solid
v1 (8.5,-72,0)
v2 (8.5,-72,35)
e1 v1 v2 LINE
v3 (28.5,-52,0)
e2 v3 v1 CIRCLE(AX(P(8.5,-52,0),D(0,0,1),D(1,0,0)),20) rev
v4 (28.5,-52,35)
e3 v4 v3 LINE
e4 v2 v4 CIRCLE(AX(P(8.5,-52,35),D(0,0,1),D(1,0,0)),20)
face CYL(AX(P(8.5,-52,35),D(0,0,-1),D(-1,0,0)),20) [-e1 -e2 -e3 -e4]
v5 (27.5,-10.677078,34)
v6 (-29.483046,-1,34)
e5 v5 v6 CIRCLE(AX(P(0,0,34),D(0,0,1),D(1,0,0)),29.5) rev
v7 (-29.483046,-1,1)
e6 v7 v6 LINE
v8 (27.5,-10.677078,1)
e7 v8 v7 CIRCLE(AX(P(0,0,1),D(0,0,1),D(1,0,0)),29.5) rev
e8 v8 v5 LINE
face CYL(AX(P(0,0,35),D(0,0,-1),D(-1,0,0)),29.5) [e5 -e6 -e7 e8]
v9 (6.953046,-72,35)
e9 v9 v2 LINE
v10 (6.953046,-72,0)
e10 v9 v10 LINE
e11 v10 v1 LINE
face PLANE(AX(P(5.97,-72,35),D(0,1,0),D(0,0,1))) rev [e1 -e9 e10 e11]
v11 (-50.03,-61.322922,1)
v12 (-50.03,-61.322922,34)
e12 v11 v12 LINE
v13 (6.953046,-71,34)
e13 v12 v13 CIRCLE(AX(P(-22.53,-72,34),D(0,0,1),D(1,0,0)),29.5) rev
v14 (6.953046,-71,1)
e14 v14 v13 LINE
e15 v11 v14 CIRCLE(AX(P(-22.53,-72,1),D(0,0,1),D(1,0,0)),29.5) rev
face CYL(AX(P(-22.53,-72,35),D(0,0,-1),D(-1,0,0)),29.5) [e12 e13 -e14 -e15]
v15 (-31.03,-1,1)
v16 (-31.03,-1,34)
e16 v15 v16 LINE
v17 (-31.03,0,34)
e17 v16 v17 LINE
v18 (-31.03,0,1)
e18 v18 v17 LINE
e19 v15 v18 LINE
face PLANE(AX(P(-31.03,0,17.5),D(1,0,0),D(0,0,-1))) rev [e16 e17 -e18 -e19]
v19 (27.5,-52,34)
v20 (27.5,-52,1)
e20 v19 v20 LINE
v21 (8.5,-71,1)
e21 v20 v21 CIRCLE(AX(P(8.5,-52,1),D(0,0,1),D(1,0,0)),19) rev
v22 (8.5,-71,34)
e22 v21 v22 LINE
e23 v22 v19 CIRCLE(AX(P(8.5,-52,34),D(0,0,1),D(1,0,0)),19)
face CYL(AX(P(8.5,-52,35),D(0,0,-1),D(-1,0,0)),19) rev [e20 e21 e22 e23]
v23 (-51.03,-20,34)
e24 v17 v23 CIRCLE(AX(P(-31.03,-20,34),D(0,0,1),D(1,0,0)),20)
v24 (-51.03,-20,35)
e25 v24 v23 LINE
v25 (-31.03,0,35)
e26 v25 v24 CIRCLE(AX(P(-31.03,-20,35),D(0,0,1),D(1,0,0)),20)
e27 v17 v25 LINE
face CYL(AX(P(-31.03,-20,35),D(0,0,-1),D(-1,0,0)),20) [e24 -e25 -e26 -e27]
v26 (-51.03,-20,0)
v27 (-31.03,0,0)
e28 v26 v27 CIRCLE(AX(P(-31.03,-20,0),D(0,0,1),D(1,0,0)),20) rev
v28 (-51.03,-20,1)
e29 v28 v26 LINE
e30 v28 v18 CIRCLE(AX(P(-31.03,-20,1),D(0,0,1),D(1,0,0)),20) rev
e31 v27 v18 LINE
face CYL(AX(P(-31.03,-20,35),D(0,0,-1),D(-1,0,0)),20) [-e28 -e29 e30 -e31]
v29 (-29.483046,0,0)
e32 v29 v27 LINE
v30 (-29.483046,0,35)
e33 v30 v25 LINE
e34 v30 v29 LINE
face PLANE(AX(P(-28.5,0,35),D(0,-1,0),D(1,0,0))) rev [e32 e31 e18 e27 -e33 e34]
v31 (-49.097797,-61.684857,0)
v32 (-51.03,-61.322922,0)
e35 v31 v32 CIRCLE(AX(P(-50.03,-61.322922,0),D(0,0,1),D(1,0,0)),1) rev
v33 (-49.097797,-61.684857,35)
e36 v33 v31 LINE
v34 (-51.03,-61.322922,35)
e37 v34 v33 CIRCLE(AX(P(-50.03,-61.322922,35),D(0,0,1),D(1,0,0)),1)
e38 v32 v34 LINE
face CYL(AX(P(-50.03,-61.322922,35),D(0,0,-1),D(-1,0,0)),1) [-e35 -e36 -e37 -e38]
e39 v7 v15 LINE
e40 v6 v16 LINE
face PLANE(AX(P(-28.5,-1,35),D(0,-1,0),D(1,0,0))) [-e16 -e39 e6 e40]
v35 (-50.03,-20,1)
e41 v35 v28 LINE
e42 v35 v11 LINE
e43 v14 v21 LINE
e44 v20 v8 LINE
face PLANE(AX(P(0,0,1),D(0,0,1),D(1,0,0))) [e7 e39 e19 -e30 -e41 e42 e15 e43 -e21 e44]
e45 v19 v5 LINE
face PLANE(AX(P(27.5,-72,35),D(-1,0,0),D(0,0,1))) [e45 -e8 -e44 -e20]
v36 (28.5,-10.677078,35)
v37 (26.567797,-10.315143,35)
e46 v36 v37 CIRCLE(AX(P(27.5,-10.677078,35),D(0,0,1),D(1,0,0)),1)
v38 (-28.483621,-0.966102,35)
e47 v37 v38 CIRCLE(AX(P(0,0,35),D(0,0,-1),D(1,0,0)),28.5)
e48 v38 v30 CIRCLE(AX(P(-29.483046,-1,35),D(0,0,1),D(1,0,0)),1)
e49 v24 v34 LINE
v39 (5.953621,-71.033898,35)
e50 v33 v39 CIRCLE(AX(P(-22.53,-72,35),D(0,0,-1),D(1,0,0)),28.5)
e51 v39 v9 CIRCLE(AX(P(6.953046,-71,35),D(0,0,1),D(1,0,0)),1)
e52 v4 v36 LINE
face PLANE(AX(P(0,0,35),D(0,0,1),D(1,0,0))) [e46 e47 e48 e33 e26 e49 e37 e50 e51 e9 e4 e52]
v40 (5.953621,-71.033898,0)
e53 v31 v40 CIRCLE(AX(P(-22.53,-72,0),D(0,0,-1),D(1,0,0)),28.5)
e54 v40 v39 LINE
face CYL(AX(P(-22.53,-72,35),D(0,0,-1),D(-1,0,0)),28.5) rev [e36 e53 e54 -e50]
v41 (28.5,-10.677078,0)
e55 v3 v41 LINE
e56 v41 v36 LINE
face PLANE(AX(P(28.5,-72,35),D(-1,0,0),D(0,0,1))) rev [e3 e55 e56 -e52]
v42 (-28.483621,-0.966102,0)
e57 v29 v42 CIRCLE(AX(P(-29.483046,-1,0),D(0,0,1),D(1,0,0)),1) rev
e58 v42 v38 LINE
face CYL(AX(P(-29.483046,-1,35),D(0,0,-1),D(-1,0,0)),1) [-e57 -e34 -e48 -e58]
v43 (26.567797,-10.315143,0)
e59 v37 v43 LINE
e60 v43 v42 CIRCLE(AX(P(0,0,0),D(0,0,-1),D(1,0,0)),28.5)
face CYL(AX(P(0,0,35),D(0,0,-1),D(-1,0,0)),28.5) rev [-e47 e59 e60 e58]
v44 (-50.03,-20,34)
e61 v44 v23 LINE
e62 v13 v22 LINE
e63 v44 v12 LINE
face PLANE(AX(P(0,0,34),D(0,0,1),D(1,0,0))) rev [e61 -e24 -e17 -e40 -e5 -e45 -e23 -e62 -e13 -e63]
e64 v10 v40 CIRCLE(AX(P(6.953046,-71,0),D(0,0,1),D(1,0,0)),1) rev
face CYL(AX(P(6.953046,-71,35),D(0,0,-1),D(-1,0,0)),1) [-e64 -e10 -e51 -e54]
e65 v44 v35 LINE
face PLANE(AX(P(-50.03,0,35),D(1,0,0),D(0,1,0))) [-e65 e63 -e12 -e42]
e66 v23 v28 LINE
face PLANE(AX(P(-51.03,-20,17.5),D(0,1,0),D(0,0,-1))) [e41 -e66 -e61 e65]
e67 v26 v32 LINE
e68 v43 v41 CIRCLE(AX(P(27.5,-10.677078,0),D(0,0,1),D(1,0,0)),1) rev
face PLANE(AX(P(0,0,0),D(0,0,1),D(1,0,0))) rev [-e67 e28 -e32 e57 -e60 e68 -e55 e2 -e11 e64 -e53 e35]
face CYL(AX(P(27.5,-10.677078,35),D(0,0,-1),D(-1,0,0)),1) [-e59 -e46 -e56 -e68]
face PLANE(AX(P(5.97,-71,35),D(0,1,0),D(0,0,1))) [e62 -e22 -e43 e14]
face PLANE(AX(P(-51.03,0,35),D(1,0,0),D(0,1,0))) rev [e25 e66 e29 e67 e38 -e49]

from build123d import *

# Parameters (mm, degrees)
EXTRUDE_1_DEPTH = 35
FILLET_1_R      = 1
FILLET_2_R      = 20
SHELL_START     = 1
SHELL_4_DEPTH   = 33


# Read off the part's stored shape, not the designer's step: 抽壳4
with BuildPart() as part:
    # 草图3 → 凸台-拉伸1 (new body)
    with BuildSketch(Plane.XY):
        with BuildLine():
            Line((-28.5, 0), (-51.03000000000027, -2.76e-15))
            Line((-51.03000000000027, -2.76e-15), (-51.029999999999994, -72))
            ThreePointArc((-51.029999999999994, -72), (-22.529999999999987, -43.5), (5.970000000000013, -72))
            Line((5.970000000000013, -72), (28.5, -72))
            Line((28.5, -72), (28.5, 0))
            ThreePointArc((28.5, 0), (-5.24e-15, -28.5), (-28.5, 0))
        make_face()
    extrude(amount=EXTRUDE_1_DEPTH)

    # 圆角1
    fillet_1_edges = [part.edges().sort_by_distance(p)[0] for p in [
        (5.970000000000011, -72, 17.5),
        (-51.02999999999999, -72, 17.5),
        (-28.5, -2.63e-15, 17.5),
    ]]
    fillet(fillet_1_edges, radius=FILLET_1_R)
    fillet_1_2_edges = [part.edges().sort_by_distance(p)[0] for p in [
        (28.5, 0, 17.5),
    ]]
    fillet(fillet_1_2_edges, radius=FILLET_1_R)

    # 圆角2
    fillet_2_edges = [part.edges().sort_by_distance(p)[0] for p in [
        (28.5, -72, 17.5),
        (-51.03000000000027, -2.76e-15, 17.5),
    ]]
    fillet(fillet_2_edges, radius=FILLET_2_R)

    # 抽壳4 outline → 抽壳4 (cut)
    with BuildSketch(Plane.XY.offset(SHELL_START)):
        with BuildLine():
            Line((-51.03, -20), (-50.03, -20))
            Line((-50.03, -20), (-50.03, -61.322921748))
            ThreePointArc((-50.03, -61.322921748), (-17.59091317, -42.916406321), (6.953045976, -71))
            Line((6.953045976, -71), (8.5, -71))
            ThreePointArc((8.5, -71), (21.935028843, -65.435028843), (27.5, -52))
            Line((27.5, -52), (27.5, -10.677078252))
            ThreePointArc((27.5, -10.677078252), (-4.93908683, -29.083593679), (-29.483045976, -1))
            Line((-29.483045976, -1), (-31.03, -1))
            Line((-31.03, -1), (-31.03, 0))
            ThreePointArc((-31.03, 0), (-45.172135624, -5.857864376), (-51.03, -20))
        make_face()
    extrude(amount=SHELL_4_DEPTH, mode=Mode.SUBTRACT)


solid = part.part
